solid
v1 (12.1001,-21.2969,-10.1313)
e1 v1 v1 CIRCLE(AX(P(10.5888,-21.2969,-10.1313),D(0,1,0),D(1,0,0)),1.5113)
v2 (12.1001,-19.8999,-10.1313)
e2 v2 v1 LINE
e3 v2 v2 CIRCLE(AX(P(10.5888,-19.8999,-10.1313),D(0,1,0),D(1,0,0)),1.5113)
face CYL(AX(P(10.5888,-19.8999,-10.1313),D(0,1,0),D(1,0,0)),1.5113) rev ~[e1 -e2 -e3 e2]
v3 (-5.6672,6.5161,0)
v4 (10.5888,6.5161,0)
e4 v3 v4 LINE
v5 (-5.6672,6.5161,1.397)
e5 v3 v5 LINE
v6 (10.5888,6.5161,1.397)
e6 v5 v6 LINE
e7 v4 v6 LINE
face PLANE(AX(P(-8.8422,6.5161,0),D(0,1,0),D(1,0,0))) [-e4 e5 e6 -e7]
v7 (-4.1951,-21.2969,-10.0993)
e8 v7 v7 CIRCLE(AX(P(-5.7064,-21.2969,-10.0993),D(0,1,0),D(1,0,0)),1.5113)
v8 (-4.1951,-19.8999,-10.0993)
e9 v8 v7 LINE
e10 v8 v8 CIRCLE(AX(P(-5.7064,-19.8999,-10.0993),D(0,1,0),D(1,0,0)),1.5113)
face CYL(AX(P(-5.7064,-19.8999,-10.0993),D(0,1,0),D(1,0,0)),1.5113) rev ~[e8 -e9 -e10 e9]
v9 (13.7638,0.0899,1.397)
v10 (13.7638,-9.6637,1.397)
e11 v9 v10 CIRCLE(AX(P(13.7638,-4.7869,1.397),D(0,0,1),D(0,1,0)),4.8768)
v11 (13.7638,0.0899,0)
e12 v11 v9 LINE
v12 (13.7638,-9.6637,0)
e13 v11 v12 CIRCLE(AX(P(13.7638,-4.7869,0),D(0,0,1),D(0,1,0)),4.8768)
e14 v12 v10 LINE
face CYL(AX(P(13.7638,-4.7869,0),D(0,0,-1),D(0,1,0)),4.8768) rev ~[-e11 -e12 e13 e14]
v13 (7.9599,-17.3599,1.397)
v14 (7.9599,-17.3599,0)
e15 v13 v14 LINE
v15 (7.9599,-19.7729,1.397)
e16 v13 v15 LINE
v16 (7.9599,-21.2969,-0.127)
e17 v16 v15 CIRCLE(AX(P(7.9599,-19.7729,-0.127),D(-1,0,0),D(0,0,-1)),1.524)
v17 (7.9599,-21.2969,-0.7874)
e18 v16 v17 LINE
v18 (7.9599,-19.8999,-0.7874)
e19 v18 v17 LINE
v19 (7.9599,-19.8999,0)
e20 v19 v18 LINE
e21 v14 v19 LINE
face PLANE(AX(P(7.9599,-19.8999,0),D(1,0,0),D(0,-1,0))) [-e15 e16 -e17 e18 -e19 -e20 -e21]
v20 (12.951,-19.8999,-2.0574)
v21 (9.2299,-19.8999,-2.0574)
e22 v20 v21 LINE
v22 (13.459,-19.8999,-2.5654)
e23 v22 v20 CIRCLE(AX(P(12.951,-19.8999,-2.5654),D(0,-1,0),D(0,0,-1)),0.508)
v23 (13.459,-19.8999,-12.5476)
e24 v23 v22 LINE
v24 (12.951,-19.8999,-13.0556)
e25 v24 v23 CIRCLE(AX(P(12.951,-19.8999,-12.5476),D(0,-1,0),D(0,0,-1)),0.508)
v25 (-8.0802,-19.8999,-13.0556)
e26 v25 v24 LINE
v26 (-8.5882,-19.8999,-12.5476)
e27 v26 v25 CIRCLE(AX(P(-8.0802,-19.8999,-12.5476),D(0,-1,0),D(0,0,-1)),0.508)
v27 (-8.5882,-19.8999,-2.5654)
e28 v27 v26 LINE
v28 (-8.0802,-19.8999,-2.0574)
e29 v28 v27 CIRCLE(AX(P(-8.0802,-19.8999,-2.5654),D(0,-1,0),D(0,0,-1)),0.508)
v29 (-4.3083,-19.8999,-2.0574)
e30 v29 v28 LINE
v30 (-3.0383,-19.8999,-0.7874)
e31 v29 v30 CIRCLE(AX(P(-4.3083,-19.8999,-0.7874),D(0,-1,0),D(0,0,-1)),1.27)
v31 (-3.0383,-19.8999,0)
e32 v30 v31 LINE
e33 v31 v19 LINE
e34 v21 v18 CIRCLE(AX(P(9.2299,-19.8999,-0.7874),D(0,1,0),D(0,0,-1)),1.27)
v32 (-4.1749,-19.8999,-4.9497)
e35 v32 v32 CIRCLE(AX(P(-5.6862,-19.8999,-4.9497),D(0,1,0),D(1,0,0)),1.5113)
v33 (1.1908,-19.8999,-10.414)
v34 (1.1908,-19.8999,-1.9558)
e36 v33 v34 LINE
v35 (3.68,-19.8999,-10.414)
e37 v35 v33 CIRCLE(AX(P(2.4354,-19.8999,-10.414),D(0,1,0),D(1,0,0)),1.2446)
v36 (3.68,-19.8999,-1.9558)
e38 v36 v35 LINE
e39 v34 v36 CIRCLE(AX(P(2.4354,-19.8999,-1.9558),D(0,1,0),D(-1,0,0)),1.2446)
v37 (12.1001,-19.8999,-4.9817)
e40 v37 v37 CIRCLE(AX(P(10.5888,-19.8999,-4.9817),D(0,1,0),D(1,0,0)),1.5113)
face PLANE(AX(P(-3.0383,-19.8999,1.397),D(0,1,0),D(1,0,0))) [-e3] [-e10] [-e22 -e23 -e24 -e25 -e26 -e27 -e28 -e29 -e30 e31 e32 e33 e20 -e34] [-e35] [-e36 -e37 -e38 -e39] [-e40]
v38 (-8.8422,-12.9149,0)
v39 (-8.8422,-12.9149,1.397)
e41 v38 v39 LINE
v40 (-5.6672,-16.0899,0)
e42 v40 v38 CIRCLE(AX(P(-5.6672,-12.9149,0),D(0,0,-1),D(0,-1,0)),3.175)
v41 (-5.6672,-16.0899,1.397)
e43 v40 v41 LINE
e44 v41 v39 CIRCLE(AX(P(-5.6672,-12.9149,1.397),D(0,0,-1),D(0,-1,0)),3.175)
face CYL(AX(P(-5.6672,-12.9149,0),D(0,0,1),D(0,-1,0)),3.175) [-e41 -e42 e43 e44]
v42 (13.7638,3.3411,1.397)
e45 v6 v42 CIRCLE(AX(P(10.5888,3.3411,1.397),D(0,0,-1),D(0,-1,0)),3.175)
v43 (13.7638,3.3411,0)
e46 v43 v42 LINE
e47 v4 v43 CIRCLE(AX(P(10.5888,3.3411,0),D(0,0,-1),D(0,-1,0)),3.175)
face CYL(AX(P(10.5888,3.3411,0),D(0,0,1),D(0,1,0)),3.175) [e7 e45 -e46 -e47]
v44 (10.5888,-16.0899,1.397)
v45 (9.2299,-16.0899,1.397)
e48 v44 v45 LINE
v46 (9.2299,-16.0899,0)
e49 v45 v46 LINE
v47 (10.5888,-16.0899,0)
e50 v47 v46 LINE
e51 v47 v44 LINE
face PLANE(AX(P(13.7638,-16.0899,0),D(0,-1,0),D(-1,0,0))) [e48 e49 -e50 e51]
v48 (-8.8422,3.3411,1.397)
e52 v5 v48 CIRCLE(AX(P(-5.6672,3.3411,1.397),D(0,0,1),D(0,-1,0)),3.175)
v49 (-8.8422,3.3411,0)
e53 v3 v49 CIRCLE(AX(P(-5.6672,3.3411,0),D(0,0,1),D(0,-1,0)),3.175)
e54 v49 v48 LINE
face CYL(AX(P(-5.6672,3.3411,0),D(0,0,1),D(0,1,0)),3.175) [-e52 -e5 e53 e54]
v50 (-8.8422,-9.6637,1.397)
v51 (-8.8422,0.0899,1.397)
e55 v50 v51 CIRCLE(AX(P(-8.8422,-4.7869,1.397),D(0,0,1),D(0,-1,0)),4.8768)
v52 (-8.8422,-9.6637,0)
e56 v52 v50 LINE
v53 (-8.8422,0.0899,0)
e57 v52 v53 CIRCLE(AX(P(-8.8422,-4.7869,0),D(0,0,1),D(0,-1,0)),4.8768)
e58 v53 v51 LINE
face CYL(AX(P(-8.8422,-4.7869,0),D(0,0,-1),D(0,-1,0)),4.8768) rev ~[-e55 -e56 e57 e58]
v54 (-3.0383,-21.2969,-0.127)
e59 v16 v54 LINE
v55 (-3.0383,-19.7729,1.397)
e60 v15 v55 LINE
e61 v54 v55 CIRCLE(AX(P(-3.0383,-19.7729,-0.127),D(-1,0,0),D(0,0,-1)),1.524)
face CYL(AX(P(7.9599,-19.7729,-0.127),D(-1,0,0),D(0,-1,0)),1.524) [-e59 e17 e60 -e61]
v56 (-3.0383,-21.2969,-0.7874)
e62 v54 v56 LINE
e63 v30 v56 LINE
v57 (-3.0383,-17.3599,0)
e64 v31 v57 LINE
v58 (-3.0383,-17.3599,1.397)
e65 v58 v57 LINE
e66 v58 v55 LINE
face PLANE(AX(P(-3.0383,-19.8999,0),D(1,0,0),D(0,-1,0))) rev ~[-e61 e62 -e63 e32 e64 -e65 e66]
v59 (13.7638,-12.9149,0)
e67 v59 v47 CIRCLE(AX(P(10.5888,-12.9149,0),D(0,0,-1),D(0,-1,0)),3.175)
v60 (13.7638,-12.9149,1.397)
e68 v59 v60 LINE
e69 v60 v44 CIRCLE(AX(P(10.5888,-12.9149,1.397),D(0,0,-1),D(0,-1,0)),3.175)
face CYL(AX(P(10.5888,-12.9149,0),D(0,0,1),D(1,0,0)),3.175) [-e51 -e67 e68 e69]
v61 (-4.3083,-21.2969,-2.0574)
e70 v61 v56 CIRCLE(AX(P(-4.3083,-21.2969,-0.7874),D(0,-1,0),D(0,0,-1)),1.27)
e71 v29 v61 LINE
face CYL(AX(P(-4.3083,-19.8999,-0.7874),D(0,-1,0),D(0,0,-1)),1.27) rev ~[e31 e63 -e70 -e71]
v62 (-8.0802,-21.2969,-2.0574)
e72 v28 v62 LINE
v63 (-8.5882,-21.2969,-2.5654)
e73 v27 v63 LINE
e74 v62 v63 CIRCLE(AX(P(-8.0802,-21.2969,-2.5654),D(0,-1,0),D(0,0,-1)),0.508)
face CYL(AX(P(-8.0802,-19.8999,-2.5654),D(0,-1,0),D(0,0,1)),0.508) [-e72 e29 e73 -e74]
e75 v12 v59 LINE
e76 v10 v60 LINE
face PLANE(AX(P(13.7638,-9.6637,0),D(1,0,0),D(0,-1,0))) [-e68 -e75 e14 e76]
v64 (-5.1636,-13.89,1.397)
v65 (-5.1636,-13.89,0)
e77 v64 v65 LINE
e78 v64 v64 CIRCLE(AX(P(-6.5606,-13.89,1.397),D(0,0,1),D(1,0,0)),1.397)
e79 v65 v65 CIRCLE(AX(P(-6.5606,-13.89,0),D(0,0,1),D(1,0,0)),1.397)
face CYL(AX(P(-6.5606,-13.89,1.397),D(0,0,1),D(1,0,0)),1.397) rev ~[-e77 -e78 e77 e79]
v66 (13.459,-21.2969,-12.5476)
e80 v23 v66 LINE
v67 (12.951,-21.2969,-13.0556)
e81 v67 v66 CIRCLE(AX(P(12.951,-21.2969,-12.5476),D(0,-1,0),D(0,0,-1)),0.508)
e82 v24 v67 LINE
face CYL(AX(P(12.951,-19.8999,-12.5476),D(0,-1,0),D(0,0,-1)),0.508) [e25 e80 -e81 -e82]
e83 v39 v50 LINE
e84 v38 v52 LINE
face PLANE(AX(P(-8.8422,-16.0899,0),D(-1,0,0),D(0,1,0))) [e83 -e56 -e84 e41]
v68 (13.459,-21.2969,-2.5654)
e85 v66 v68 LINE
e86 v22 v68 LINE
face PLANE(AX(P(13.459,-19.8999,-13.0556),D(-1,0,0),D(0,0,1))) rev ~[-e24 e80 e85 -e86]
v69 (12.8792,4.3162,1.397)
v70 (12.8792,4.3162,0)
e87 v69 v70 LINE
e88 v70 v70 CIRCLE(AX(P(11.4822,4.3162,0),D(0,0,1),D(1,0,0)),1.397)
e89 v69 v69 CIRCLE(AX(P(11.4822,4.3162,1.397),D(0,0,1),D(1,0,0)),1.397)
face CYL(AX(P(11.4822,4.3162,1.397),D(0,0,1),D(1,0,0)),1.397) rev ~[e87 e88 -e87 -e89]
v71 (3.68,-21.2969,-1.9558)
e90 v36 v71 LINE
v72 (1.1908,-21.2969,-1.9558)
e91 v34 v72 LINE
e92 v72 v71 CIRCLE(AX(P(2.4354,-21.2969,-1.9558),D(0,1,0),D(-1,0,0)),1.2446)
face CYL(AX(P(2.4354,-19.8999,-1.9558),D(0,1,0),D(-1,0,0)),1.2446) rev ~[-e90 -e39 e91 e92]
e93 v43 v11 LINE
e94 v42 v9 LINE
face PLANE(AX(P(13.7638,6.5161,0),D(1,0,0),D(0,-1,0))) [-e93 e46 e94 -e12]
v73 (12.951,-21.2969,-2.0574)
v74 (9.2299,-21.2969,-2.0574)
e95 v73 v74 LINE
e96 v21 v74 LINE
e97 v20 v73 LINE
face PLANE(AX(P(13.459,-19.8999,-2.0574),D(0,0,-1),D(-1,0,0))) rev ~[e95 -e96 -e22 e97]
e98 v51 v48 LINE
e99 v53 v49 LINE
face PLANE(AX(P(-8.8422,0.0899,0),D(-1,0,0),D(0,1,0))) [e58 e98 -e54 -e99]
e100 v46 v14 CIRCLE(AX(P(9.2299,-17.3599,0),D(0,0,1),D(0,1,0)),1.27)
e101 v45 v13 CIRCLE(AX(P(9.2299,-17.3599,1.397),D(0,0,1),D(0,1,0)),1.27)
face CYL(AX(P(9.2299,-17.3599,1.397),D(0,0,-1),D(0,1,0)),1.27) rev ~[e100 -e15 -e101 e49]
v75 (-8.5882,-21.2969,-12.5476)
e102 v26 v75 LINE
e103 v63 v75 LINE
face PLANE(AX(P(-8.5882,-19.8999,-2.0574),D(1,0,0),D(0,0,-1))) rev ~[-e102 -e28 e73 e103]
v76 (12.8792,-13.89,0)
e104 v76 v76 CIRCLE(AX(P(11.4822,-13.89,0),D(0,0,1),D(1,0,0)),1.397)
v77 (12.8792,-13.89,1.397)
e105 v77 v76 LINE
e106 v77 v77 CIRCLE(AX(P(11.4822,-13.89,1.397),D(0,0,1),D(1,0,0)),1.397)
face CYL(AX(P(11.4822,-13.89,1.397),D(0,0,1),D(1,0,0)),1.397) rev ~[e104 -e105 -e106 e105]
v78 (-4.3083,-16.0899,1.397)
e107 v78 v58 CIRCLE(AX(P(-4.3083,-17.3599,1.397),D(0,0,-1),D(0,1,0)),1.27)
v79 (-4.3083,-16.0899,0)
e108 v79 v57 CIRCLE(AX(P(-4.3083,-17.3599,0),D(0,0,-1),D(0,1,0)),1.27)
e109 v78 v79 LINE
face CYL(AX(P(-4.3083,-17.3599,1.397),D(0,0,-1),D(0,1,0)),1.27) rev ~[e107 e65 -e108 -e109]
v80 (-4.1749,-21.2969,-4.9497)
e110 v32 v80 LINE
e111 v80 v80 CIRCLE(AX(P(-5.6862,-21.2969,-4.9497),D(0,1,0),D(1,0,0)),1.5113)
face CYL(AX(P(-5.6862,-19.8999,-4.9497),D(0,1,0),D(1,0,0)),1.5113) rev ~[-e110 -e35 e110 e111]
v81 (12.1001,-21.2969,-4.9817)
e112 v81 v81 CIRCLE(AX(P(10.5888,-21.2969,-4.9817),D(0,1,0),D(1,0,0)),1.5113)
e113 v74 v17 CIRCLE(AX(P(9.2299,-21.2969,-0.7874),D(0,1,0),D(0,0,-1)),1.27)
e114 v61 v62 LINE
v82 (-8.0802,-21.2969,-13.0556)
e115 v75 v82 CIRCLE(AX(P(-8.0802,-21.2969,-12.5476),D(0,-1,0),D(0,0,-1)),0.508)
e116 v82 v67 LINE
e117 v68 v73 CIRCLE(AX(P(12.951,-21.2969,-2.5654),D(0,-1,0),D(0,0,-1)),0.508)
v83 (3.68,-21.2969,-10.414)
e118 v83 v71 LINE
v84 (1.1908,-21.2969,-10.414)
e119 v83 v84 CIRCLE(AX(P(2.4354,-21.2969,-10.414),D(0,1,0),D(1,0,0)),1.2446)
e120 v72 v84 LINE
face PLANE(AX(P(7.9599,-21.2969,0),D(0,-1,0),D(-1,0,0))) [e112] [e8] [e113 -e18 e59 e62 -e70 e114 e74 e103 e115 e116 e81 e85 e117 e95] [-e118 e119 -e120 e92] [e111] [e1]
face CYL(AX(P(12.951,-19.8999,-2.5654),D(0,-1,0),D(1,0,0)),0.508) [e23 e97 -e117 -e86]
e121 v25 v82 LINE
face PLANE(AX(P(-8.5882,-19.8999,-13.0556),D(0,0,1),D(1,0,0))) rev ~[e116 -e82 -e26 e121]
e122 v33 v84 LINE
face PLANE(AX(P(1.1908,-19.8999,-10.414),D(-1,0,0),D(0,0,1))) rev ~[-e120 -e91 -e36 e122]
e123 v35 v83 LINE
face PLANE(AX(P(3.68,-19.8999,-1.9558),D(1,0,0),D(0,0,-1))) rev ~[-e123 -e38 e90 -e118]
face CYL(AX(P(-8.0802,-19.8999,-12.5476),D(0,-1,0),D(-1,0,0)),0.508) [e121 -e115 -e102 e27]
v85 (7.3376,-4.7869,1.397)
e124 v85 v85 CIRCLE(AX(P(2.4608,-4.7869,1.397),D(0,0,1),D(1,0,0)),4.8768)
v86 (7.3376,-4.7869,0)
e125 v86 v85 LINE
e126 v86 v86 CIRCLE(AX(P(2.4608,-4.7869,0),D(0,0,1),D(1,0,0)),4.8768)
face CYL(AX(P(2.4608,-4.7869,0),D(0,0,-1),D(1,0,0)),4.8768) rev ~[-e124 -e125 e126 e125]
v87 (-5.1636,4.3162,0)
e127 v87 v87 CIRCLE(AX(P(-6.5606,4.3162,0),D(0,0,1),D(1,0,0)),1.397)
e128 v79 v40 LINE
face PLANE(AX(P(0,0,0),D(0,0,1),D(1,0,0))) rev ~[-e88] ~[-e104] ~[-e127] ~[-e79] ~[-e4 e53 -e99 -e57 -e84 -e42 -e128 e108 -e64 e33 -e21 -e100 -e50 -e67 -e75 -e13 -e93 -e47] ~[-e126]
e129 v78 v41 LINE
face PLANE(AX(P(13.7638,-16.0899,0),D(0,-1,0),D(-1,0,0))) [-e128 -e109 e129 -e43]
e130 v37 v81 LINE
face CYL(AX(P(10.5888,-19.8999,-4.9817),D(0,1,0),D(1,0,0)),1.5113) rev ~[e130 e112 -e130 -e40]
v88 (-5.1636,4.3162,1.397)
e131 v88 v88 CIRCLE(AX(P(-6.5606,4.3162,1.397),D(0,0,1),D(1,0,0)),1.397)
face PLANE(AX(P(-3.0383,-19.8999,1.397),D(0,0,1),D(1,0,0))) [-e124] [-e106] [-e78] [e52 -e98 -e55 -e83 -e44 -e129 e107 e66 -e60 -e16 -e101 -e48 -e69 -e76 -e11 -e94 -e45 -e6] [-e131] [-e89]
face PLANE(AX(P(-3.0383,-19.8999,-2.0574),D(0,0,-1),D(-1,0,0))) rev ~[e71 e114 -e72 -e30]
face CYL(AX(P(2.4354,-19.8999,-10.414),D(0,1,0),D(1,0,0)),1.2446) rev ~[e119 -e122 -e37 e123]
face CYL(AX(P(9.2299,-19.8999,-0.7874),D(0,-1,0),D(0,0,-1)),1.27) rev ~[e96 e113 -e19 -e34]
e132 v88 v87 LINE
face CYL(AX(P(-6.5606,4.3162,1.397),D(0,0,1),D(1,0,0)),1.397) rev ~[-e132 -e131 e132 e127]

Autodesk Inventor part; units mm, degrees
ref_plane "YZ Plane" through (0, 0, 0) normal (1, 0, 0) x (0, 1, 0)
ref_plane "XZ Plane" through (0, 0, 0) normal (0, 1, 0) x (-1, 0, 0)
ref_plane "XY Plane" through (0, 0, 0) normal (0, 0, 1) x (1, 0, 0)
sketch "Sketch1" plane through (0, 0, 0) normal (0, 0, 1) x (1, 0, 0)
  line L0 (-8.8422, 6.5161) -> (13.7638, 6.5161)
  line L1 (13.7638, -16.0899) -> (-8.8422, -16.0899)
  circle A0 centre (2.4608, -4.7869) radius 4.8768
  arc A1 (-8.8422, -9.6637) -> (-8.8422, 0.0899) centre (-8.8422, -4.7869) ccw
  line L2 (-8.8422, -16.0899) -> (-8.8422, -9.6637)
  line L3 (-8.8422, 0.0899) -> (-8.8422, 6.5161)
  arc A2 (13.7638, 0.0899) -> (13.7638, -9.6637) centre (13.7638, -4.7869) ccw
  line L4 (13.7638, 6.5161) -> (13.7638, 0.0899)
  line L5 (13.7638, -9.6637) -> (13.7638, -16.0899)
  dimension "d2" = 22.606
  dimension "d3" = 22.606
  dimension "d4" = 9.7536
  dimension "d5" = 9.7536
extrude "Extrusion1" add sketch "Sketch1" along normal blind 1.397
fillet "Fillet1" radius 3.175 4 edges at (-8.8422, 6.5161, 0.6985) (13.7638, 6.5161, 0.6985) (13.7638, -16.0899, 0.6985) (-8.8422, -16.0899, 0.6985)
sketch "Sketch2" plane through (0, 0, 1.397) normal (0, 0, 1) x (1, 0, 0)
  line L0 (-8.8422, 3.3411) -> (-8.8422, 0.0899) projected
  circle A0 centre (-6.5606, 4.3162) radius 1.397
  line L1 (10.5888, 6.5161) -> (-5.6672, 6.5161) projected
  arc A1 (-8.8422, -9.6637) -> (-8.8422, 0.0899) centre (-8.8422, -4.7869) ccw projected
  arc A2 (13.7638, 0.0899) -> (13.7638, -9.6637) centre (13.7638, -4.7869) ccw projected
  circle A3 centre (-6.5606, -13.89) radius 1.397
  line L2 (-5.6672, -16.0899) -> (10.5888, -16.0899) projected
  circle A4 centre (11.4822, 4.3162) radius 1.397
  circle A5 centre (11.4822, -13.89) radius 1.397
  point P0 (0, 0)
  dimension "d9" = 2.794
extrude "Extrusion2" cut sketch "Sketch2" against normal blind 1.397
sketch "Sketch3" plane through (0, 0, 1.397) normal (0, 0, 1) x (1, 0, 0)
  line L0 (2.4608, -16.0899) -> (2.4608, -9.6637)
  circle A0 centre (2.4608, -4.7869) radius 4.8768 projected
  line L1 (2.4608, -16.0899) -> (0.1367, -16.0899)
  line L2 (-3.0383, -16.0899) -> (7.9599, -16.0899)
  line L3 (2.4608, -16.0899) -> (7.9599, -16.0899)
  line L4 (2.4608, -16.0899) -> (7.9599, -16.0899)
  line L5 (10.5888, -16.0899) -> (-5.6672, -16.0899) projected
  line L6 (7.9599, -17.9949) -> (7.9599, -16.0899)
  line L7 (-3.0383, -17.9949) -> (-3.0383, -16.0899)
  line L8 (-3.0383, -17.9949) -> (-3.0383, -19.8999)
  line L9 (-3.0383, -19.8999) -> (7.9599, -19.8999)
  line L10 (7.9599, -19.8999) -> (7.9599, -17.9949)
  point P0 (0, 0)
  point P1 (-5.6672, -16.0899)
  dimension "d12" = 5.4991
  dimension "d13" = 5.4991
  dimension "d14" = 1.905
  dimension "d16" = 1.905
extrude "Extrusion3" add sketch "Sketch3" against normal blind 1.397 contours L2 L6 L10 L9 L8 L7 L1
fillet "Fillet2" radius 1.27 2 edges at (7.9599, -16.0899, 0.6985) (-3.0383, -16.0899, 0.6985)
sketch "Sketch4" plane through (-3.0383, -19.8999, 1.397) normal (0, -1, 0) x (1, 0, 0)
  line L0 (10.9982, -1.397) -> (0, -1.397) projected
  line L1 (10.9982, -1.397) -> (10.9982, -3.4544)
  line L2 (10.9982, -3.4544) -> (0, -3.4544)
  line L3 (0, -3.4544) -> (0, -1.397)
  point P0 (3.0383, -1.397)
  dimension "d20" = 2.0574
extrude "Extrusion4" add sketch "Sketch4" along normal blind 1.397
sketch "Sketch5" plane through (-3.0383, -19.8999, 1.397) normal (0, 1, 0) x (1, 0, 0)
  line L0 (10.9982, 3.4544) -> (10.9982, 1.397) projected
  line L1 (10.9982, 3.4544) -> (-5.5499, 3.4544)
  line L2 (-5.5499, 3.4544) -> (-5.5499, 14.4526)
  line L3 (-5.5499, 14.4526) -> (16.4973, 14.4526)
  line L4 (10.9982, 1.397) -> (0, 1.397) projected
  line L5 (0, 3.4544) -> (10.9982, 3.4544) projected
  line L6 (0, 3.4544) -> (10.9982, 3.4544) projected
  line L7 (16.4973, 14.4526) -> (16.4973, 3.4544)
  line L8 (16.4973, 3.4544) -> (10.9982, 3.4544)
  point P0 (5.4991, 3.4544)
  point P1 (5.4991, 3.4544)
  dimension "d25" = 22.0472
  dimension "d38" = 10.9982
extrude "Extrusion5" add sketch "Sketch5" against normal blind 1.397
fillet "Fillet3" radius 1.27 2 edges at (-3.0383, -20.5984, -2.0574) (7.9599, -20.5984, -2.0574)
fillet "Fillet4" radius 0.508 4 edges at (-8.5882, -20.5984, -2.0574) (-8.5882, -20.5984, -13.0556) (13.459, -20.5984, -2.0574) (13.459, -20.5984, -13.0556)
sketch "Sketch8" plane through (-3.0383, -19.8999, 0) normal (0, 0, 1) x (1, 0, 0)
  line L0 (0, 0) -> (0, -1.397) projected
  line L1 (0, -1.397) -> (0, 0)
  line L2 (10.9982, 0) -> (10.9982, -1.397) projected
  line L3 (0, 0) -> (10.9982, 0)
  line L4 (10.9982, 0) -> (10.9982, -1.397)
  line L5 (10.9982, -1.397) -> (0, -1.397)
  point P0 (3.0383, 19.8999)
extrude "Extrusion8" add sketch "Sketch8" along normal blind 1.397
fillet "Fillet5" radius 1.524 1 edges at (2.4608, -21.2969, 1.397)
sketch "Sketch11" plane through (-3.0383, -19.8999, 1.397) normal (0, 1, 0) x (1, 0, 0)
  line L0 (-5.0419, 14.4526) -> (15.9893, 14.4526) projected
  line L1 (-2.6289, 1.397) -> (13.6271, 1.397) projected
  line L2 (16.4973, 13.9446) -> (16.4973, 3.9624) projected
  line L3 (-5.5499, 13.9446) -> (-5.5499, 3.9624) projected
  circle A0 centre (13.6271, 11.5283) radius 1.5113
  line L4 (6.7183, 3.3528) -> (6.7183, 11.811)
  line L5 (4.2291, 11.811) -> (4.2291, 3.3528)
  arc A1 (4.2291, 3.3528) -> (6.7183, 3.3528) centre (5.4737, 3.3528) ccw
  arc A2 (6.7183, 11.811) -> (4.2291, 11.811) centre (5.4737, 11.811) ccw
  circle A3 centre (13.6271, 6.3787) radius 1.5113
  line L6 (0, 1.524) -> (10.9982, 1.524) projected
  circle A4 centre (-2.6681, 11.4963) radius 1.5113
  circle A5 centre (-2.6479, 6.3467) radius 1.5113
  point P0 (5.4737, 7.5819)
  dimension "d43" = 3.0226
  dimension "d47" = 2.8702
  dimension "d50" = 2.6416
  dimension "d51" = 1.9558
extrude "Extrusion10" cut sketch "Sketch11" against normal through all
properties part number "mcdave_mount"
